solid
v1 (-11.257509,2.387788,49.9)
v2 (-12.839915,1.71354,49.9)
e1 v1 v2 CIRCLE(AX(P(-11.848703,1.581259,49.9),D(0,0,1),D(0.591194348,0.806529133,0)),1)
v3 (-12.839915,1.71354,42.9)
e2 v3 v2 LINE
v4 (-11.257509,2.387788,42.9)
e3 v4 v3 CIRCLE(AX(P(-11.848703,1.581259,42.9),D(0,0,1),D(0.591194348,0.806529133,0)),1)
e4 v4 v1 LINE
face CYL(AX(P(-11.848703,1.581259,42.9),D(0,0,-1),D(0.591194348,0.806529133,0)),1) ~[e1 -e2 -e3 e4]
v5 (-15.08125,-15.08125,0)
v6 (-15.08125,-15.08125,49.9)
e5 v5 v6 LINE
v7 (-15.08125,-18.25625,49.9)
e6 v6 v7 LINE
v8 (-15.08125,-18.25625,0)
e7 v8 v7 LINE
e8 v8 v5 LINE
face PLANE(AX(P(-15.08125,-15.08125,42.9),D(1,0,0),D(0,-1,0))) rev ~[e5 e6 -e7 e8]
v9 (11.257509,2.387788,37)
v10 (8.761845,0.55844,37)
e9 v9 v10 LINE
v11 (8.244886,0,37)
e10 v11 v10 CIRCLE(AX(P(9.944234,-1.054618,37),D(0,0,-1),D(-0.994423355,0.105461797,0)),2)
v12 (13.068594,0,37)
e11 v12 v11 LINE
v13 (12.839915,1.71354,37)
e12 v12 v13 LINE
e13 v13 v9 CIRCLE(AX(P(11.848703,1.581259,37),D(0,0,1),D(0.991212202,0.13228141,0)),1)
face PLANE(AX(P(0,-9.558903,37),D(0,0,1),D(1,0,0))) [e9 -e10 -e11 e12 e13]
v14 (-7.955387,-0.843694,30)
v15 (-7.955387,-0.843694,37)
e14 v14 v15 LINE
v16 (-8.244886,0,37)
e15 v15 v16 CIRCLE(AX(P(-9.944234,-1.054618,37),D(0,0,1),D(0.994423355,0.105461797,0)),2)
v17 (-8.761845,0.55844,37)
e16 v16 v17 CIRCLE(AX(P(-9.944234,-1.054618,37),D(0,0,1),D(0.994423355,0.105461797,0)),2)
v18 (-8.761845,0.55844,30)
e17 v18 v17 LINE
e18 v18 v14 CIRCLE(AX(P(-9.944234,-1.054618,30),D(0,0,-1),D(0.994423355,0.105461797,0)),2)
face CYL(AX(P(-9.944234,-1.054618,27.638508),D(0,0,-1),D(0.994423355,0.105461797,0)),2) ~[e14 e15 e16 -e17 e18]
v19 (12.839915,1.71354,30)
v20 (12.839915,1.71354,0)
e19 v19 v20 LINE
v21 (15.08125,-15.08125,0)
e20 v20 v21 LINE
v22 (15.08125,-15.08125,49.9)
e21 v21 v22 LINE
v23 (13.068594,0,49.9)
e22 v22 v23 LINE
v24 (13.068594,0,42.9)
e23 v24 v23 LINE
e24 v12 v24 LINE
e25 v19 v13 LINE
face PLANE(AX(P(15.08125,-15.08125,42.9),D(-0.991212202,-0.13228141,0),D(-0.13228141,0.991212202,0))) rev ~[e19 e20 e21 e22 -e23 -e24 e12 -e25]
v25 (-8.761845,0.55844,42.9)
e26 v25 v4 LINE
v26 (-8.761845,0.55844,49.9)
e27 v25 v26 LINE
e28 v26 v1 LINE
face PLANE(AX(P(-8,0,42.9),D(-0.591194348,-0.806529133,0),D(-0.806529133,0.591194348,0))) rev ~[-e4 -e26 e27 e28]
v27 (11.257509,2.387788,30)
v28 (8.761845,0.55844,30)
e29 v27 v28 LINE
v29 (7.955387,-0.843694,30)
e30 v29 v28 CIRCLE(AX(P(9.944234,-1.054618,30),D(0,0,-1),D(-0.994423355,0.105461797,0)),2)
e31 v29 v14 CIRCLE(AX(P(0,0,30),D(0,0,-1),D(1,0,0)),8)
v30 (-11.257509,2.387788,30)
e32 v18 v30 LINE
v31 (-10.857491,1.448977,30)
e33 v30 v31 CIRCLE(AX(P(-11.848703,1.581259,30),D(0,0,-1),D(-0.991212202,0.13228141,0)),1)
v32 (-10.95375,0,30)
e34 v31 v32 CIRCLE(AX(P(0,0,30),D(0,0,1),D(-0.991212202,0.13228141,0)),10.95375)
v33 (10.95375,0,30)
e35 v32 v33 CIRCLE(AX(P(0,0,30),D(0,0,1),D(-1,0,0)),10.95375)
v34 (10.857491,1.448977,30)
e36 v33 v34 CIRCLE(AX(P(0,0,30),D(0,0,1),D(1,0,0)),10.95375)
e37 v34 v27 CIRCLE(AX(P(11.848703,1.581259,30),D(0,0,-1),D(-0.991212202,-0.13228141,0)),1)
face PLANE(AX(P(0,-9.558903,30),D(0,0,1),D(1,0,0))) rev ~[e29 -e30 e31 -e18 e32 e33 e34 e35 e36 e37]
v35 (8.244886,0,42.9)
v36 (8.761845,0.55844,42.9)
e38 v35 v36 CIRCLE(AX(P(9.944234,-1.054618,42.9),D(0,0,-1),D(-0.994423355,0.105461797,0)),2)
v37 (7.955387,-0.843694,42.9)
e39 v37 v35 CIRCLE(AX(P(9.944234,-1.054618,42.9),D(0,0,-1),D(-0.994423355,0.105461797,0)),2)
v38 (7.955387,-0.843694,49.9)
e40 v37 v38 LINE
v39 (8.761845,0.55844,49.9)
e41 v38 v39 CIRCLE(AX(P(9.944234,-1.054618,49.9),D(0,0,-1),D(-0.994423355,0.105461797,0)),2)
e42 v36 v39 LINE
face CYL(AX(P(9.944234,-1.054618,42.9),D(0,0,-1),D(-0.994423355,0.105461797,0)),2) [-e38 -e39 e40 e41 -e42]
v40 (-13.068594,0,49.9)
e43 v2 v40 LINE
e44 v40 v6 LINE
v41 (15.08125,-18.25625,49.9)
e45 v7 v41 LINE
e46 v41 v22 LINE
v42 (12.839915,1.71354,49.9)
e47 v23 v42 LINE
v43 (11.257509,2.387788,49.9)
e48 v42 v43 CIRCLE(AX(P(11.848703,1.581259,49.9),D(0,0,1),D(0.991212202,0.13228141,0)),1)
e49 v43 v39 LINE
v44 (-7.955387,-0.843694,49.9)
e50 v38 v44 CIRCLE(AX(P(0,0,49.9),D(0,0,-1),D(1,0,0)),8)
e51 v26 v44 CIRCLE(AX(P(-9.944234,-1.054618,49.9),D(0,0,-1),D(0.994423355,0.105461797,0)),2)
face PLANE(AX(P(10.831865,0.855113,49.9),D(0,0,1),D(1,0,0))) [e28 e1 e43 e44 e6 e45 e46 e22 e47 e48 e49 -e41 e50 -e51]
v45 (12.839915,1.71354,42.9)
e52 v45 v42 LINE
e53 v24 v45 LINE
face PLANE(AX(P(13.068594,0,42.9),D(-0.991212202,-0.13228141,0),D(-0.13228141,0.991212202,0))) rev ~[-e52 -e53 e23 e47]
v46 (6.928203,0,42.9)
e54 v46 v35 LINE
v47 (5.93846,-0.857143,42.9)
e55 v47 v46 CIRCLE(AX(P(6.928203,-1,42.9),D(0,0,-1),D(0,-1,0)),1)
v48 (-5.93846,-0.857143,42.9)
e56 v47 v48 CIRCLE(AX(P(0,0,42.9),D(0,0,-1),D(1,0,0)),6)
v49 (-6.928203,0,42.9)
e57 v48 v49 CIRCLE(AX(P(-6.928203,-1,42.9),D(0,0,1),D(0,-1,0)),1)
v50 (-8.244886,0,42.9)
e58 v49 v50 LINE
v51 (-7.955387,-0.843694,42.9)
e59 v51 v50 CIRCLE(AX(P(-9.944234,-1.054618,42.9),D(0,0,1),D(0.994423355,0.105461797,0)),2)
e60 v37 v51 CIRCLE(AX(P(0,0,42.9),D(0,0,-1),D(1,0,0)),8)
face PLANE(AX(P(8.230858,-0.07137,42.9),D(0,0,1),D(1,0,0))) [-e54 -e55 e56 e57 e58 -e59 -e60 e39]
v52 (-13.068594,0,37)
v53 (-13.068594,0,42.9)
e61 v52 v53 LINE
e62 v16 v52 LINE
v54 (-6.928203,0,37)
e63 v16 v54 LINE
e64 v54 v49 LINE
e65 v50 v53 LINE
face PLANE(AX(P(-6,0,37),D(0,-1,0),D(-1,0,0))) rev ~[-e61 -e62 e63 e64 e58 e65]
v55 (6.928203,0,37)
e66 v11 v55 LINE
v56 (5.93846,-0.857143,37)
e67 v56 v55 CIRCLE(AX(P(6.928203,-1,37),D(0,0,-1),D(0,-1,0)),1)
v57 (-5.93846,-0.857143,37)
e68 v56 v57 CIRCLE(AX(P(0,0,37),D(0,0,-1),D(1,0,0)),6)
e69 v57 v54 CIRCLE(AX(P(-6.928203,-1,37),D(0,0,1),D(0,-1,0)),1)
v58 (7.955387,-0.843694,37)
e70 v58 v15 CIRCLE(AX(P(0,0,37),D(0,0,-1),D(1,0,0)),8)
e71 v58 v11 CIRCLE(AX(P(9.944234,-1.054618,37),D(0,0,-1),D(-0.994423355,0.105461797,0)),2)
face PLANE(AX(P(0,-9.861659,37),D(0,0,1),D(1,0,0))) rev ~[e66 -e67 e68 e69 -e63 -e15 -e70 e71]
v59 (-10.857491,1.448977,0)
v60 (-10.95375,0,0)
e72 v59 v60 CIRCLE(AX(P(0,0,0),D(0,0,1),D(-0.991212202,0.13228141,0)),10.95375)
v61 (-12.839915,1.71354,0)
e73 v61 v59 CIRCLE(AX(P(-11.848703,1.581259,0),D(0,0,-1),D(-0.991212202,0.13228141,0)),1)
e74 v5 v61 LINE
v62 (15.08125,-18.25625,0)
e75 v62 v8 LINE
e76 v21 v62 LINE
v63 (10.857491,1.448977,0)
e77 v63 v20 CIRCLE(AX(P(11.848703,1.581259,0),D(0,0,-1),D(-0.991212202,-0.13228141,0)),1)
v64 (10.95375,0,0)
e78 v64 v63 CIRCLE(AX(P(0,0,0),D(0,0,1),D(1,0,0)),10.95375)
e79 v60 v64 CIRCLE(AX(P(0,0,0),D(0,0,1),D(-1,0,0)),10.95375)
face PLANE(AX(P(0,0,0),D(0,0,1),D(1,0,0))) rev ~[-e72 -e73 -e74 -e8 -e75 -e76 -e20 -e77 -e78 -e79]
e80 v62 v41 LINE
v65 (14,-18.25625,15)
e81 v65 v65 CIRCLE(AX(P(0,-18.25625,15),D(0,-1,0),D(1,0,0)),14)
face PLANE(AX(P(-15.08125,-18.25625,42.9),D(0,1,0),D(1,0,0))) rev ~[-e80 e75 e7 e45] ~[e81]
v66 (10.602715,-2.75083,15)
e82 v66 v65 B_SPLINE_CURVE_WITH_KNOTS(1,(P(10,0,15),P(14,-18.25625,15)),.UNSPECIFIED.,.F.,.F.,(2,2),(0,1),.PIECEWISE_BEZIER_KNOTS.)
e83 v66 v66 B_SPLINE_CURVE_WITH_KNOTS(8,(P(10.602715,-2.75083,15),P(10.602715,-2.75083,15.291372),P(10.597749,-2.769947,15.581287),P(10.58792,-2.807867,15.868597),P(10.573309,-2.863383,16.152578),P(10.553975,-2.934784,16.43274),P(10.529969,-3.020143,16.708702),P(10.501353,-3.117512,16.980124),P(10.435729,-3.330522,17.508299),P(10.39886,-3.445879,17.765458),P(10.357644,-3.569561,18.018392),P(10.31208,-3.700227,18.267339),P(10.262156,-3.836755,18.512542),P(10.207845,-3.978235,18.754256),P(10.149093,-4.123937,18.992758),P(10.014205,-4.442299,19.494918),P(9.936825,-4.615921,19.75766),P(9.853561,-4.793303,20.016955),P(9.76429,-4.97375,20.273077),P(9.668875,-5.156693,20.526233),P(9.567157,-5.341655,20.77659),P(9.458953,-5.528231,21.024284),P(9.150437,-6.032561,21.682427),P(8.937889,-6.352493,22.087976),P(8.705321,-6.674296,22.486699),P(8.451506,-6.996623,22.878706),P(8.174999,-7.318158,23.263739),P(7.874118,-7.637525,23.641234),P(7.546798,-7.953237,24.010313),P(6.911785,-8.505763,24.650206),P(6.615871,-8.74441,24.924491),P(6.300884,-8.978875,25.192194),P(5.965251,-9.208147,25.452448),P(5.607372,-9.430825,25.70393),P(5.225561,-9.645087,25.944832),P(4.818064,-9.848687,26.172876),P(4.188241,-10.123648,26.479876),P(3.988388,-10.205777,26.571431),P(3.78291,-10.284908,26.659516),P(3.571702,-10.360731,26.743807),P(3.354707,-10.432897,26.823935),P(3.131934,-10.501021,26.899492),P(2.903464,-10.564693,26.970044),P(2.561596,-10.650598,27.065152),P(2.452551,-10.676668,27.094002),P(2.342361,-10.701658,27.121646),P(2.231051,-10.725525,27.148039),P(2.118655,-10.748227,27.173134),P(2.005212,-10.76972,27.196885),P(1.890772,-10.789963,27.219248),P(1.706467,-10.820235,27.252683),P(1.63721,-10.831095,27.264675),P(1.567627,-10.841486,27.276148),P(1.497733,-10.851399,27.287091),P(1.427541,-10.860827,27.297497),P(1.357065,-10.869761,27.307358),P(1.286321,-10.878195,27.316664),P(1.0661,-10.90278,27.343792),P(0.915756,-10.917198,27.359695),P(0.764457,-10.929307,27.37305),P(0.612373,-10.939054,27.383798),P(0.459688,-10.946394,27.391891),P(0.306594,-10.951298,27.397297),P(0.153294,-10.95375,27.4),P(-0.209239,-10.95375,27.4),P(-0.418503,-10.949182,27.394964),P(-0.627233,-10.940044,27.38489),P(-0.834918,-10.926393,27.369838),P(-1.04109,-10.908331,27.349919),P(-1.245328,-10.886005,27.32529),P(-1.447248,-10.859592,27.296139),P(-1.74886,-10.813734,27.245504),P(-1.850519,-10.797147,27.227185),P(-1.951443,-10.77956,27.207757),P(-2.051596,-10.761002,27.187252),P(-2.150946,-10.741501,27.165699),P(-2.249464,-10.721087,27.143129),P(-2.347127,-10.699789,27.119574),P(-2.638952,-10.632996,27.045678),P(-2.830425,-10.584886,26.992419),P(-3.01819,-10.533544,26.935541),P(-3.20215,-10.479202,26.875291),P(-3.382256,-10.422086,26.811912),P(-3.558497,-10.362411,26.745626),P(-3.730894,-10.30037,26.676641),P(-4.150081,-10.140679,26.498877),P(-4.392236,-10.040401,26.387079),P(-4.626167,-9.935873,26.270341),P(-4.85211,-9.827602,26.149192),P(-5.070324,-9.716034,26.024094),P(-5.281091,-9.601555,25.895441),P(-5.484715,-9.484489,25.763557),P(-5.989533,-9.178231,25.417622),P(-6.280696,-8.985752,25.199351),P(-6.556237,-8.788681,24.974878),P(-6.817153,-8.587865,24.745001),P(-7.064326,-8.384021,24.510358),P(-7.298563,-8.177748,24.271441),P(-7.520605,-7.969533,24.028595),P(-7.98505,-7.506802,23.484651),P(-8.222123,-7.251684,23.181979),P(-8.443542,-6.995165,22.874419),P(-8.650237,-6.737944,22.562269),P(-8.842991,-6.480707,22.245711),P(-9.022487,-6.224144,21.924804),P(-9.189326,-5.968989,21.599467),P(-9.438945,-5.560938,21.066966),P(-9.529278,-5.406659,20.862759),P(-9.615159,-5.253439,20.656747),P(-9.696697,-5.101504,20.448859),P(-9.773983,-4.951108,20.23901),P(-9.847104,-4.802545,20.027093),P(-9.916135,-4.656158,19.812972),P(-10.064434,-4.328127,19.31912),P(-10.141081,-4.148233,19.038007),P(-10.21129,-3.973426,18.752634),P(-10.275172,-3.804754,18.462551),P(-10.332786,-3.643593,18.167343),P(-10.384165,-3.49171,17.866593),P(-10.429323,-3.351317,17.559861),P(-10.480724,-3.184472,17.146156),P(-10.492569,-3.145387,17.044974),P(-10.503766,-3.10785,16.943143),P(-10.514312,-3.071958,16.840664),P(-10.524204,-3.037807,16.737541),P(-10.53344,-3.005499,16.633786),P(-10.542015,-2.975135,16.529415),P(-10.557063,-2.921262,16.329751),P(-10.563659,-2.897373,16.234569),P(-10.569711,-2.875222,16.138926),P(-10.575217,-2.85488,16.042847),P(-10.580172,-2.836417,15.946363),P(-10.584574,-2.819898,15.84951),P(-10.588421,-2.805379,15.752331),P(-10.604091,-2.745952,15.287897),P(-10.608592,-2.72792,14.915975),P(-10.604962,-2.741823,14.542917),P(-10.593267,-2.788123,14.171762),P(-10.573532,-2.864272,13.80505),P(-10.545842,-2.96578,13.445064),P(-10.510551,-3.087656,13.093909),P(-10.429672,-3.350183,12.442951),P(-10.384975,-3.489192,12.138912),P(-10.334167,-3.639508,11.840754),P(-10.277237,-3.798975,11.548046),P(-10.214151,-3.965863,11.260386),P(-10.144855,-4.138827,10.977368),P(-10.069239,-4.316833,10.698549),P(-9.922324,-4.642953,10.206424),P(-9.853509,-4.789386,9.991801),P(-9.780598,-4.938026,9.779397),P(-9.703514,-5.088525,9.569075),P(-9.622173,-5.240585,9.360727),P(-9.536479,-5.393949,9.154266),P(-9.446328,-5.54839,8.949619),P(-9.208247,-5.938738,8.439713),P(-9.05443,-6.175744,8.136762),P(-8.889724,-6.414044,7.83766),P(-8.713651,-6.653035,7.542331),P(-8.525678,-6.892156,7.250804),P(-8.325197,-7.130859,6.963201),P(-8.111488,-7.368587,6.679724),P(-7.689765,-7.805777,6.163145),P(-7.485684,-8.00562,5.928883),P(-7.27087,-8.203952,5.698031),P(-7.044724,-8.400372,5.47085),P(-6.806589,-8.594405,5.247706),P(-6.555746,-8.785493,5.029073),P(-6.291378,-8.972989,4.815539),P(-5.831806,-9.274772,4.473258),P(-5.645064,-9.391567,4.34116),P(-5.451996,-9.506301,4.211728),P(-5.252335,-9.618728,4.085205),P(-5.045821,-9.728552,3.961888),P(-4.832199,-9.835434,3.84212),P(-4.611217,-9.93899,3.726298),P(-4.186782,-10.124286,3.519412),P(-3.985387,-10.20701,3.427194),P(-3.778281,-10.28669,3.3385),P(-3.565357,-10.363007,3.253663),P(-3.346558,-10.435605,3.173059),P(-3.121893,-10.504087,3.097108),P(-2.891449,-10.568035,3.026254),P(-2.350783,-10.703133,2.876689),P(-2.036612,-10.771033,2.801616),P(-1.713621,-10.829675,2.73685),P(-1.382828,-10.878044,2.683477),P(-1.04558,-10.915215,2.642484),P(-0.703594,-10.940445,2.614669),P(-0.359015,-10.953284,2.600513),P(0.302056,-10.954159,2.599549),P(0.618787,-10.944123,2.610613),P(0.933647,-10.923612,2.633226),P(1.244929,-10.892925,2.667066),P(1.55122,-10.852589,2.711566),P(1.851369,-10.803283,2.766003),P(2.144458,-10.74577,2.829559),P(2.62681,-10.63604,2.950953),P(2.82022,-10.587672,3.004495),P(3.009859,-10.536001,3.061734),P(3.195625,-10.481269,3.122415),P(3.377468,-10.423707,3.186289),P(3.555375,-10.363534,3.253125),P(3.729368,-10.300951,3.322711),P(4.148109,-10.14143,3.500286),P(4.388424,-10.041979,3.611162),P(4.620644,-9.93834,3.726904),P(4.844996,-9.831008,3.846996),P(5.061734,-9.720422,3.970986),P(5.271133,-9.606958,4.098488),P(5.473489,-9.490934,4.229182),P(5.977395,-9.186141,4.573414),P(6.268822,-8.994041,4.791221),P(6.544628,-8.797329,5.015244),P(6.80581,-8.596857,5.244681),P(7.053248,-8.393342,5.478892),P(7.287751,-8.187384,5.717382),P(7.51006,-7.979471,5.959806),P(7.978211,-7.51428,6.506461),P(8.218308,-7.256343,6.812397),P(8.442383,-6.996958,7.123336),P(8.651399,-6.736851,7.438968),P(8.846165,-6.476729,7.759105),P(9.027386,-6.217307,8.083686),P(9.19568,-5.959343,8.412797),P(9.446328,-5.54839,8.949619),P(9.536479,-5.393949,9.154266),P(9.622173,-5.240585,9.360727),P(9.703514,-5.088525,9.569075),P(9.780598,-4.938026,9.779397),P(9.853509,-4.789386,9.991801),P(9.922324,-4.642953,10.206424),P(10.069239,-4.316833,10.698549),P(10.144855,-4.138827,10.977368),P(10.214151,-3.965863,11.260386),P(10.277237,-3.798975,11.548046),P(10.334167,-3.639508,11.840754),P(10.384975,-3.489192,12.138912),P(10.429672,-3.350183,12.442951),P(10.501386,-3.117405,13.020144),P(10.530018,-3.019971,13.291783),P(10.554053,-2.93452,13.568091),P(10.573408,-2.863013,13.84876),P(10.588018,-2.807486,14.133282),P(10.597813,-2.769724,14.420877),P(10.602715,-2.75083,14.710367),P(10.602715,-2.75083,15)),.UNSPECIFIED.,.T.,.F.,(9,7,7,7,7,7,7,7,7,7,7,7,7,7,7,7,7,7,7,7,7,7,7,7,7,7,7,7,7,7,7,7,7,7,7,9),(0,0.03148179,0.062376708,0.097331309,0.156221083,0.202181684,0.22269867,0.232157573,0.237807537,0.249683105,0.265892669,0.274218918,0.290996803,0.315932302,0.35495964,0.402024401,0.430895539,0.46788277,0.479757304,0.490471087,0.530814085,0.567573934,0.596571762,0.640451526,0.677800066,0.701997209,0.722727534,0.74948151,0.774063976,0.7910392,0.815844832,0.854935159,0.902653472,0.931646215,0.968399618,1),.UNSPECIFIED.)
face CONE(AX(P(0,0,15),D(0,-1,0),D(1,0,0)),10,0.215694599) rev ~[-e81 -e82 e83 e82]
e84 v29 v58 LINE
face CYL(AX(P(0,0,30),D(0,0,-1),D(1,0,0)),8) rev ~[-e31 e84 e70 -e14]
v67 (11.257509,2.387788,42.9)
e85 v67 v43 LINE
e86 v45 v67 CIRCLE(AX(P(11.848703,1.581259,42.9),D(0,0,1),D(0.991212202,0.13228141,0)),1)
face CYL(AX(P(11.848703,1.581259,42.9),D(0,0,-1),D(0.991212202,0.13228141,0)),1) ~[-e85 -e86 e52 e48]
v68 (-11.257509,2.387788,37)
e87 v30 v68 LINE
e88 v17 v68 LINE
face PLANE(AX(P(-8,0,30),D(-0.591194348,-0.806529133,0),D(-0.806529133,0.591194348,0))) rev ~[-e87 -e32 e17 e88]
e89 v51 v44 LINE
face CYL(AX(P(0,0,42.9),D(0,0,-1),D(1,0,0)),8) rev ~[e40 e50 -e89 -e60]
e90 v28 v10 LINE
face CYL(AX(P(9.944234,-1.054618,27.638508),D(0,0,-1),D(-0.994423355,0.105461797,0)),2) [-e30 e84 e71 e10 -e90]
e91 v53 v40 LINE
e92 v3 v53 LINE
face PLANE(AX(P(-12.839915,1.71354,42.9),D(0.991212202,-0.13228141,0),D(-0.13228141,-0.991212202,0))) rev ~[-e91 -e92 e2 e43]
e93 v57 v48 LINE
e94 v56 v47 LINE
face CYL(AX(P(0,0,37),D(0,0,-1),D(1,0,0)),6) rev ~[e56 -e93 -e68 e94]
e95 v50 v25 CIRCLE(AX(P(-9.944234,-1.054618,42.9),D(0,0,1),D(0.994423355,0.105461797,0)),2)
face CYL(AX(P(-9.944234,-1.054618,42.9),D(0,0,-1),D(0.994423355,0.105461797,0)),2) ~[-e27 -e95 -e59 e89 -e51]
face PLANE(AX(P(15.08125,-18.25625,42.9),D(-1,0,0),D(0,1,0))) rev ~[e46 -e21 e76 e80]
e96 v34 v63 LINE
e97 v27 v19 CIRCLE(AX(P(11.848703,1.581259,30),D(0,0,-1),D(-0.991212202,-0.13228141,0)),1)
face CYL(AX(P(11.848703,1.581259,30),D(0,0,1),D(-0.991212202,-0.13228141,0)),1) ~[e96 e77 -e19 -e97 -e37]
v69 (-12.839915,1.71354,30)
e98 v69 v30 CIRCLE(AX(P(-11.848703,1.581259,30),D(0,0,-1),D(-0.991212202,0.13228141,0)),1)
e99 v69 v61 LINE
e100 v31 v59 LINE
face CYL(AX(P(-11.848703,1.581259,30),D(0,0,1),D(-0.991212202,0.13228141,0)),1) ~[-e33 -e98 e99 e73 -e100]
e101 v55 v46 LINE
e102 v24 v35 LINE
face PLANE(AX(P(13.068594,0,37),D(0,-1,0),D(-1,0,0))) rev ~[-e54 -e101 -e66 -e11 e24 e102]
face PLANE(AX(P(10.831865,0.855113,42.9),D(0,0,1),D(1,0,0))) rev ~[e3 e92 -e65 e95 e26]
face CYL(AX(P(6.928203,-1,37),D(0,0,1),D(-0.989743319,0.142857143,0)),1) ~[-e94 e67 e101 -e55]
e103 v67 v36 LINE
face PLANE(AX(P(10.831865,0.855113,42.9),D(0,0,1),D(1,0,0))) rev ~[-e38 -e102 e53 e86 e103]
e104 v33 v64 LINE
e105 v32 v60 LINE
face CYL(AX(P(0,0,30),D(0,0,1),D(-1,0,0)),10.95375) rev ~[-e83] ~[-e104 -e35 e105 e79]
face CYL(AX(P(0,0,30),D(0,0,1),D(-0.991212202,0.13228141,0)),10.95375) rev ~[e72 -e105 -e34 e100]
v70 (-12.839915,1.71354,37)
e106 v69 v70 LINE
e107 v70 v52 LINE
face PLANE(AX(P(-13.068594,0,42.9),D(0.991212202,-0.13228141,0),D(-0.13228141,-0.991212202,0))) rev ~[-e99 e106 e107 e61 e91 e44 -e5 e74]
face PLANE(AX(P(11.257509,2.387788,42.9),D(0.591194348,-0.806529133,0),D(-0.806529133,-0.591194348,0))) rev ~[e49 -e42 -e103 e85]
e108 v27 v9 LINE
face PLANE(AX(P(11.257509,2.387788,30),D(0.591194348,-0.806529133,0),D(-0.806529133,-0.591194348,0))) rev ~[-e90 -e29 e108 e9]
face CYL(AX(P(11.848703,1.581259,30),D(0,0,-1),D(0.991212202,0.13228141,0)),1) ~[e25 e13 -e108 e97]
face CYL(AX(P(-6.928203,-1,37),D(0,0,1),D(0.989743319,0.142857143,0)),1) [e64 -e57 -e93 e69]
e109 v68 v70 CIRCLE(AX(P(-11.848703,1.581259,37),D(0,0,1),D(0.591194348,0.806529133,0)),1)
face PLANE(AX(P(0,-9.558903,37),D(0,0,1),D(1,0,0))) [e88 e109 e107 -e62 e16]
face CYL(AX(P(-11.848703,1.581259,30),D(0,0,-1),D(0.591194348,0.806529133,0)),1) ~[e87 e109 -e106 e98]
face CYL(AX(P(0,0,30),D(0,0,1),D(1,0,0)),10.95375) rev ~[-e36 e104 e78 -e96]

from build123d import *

# Parameters (mm, degrees)
F0_W         = 50.8
F0_H         = 50.8
F1_DEPTH     = 30
F2_W         = 50.8
F2_H         = 50.8
F3_DEPTH     = 30
F5_R         = 10
F4_R         = 14
F8_DEPTH     = 7
F10_DEPTH    = 5.9
F12_DEPTH    = 7
F13_T1_DEPTH = 9.3614920568
F13_T3_DEPTH = 9.3614920568
F14_R        = 1


# Not quite as in the source:
# - a fillet or chamfer that OpenCascade refuses, or shapes differently, is made with other operations: its cross-section is extruded or revolved along the edge and cut away or added


with BuildPart() as f1:
    # F0 (on Top) → F1 (new body)
    with BuildSketch(Plane.XY):
        Rectangle(F0_W, F0_H)
    extrude(amount=F1_DEPTH)

    # F2 (on face) → F3 (cut, through all)
    with BuildSketch(Plane.XY.offset(30)):
        Rectangle(F2_W, F2_H)
        with BuildLine():
            ThreePointArc((-12.8399150562, 1.7135403152), (-11.7164214446, 2.5724711068), (-10.857490653, 1.4489774952))
            ThreePointArc((-10.857490653, 1.4489774952), (-10.9296586704, 0.7260856773), (-10.95375, 0))
            Line((-10.95375, 0), (10.95375, 0))
            ThreePointArc((10.95375, 0), (10.9296586704, 0.7260856773), (10.857490653, 1.4489774952))
            ThreePointArc((10.857490653, 1.4489774952), (11.7164214446, 2.5724711068), (12.8399150562, 1.7135403152))
            Line((12.8399150562, 1.7135403152), (15.08125, -15.08125))
            Line((15.08125, -15.08125), (15.08125, -18.25625))
            Line((15.08125, -18.25625), (-15.08125, -18.25625))
            Line((-15.08125, -18.25625), (-15.08125, -15.08125))
            Line((-15.08125, -15.08125), (-12.8399150562, 1.7135403152))
        make_face(mode=Mode.SUBTRACT)
        with BuildLine():
            Line((10.95375, 0), (-10.95375, 0))
            ThreePointArc((-10.95375, 0), (0, -10.95375), (10.95375, 0))
        make_face()
    extrude(amount=-F3_DEPTH, mode=Mode.SUBTRACT)

    # F5 (on Front) → F6 section 0
    with BuildSketch(Plane.XZ):
        with Locations((0, 15)):
            Circle(F5_R)
    # F4 (on face) → F6 section 1
    with BuildSketch(Plane.XZ.offset(18.25625)):
        with Locations((0, 15)):
            Circle(F4_R)
    loft(mode=Mode.SUBTRACT)

    # F7 (on face) → F8 (join)
    with BuildSketch(Plane.XY.offset(30)):
        with BuildLine():
            ThreePointArc((-10.857490653, 1.4489774952), (-10.9287333274, 1.9732487889), (-11.2575085067, 2.3877880386))
            ThreePointArc((-11.2575085067, 2.3877880386), (-12.2406927383, 2.5012284324), (-12.8399150562, 1.7135403152))
            Line((-12.8399150562, 1.7135403152), (-15.08125, -15.08125))
            Line((-15.08125, -15.08125), (-15.08125, -18.25625))
            Line((-15.08125, -18.25625), (15.08125, -18.25625))
            Line((15.08125, -18.25625), (15.08125, -15.08125))
            Line((15.08125, -15.08125), (12.8399150562, 1.7135403152))
            ThreePointArc((12.8399150562, 1.7135403152), (12.2406927383, 2.5012284324), (11.2575085067, 2.3877880386))
            ThreePointArc((11.2575085067, 2.3877880386), (10.9287333274, 1.9732487889), (10.857490653, 1.4489774952))
            ThreePointArc((10.8574906531, 1.4489774952), (0, -10.95375), (-10.857490653, 1.4489774952))
        make_face()
        with BuildLine():
            ThreePointArc((8, 0), (0, -8), (-8, 0))
            Line((-8, 0), (-11.2575085067, 2.3877880386))
            ThreePointArc((-11.2575085067, 2.3877880386), (-10.9287333274, 1.9732487889), (-10.857490653, 1.4489774952))
            ThreePointArc((-10.857490653, 1.4489774952), (0, -10.95375), (10.8574906531, 1.4489774952))
            ThreePointArc((10.857490653, 1.4489774952), (10.9287333274, 1.9732487889), (11.2575085067, 2.3877880386))
            Line((11.2575085067, 2.3877880386), (8, 0))
        make_face()
    extrude(amount=F8_DEPTH)

    # F9 (on face) → F10 (join)
    with BuildSketch(Plane.XY.offset(37)):
        with BuildLine():
            ThreePointArc((8, 0), (0, -8), (-8, 0))
            Line((-8, 0), (-13.0685941712, 0))
            Line((-13.0685941712, 0), (-15.08125, -15.08125))
            Line((-15.08125, -15.08125), (-15.08125, -18.25625))
            Line((-15.08125, -18.25625), (15.08125, -18.25625))
            Line((15.08125, -18.25625), (15.08125, -15.08125))
            Line((15.08125, -15.08125), (13.0685941712, 0))
            Line((13.0685941712, 0), (8, 0))
        make_face()
        with BuildLine():
            ThreePointArc((6, 0), (0, -6), (-6, 0))
            Line((-6, 0), (-8, 0))
            ThreePointArc((-8, 0), (0, -8), (8, 0))
            Line((8, 0), (6, 0))
        make_face()
    extrude(amount=F10_DEPTH)

    # F11 (on face) → F12 (join)
    with BuildSketch(Plane.XY.offset(42.9)):
        with BuildLine():
            Line((11.2575085067, 2.3877880386), (8, 0))
            Line((8, 0), (13.0685941712, 0))
            Line((13.0685941712, 0), (12.8399150562, 1.7135403152))
            ThreePointArc((12.8399150562, 1.7135403152), (12.2406927383, 2.5012284324), (11.2575085067, 2.3877880386))
        make_face()
        with BuildLine():
            Line((-13.0685941712, 0), (-8, 0))
            Line((-8, 0), (-11.2575085067, 2.3877880386))
            ThreePointArc((-11.2575085067, 2.3877880386), (-12.2406927383, 2.5012284324), (-12.8399150562, 1.7135403152))
            Line((-12.8399150562, 1.7135403152), (-13.0685941712, 0))
        make_face()
        with BuildLine():
            ThreePointArc((8, 0), (0, -8), (-8, 0))
            Line((-8, 0), (-13.0685941712, 0))
            Line((-13.0685941712, 0), (-15.08125, -15.08125))
            Line((-15.08125, -15.08125), (-15.08125, -18.25625))
            Line((-15.08125, -18.25625), (15.08125, -18.25625))
            Line((15.08125, -18.25625), (15.08125, -15.08125))
            Line((15.08125, -15.08125), (13.0685941712, 0))
            Line((13.0685941712, 0), (8, 0))
        make_face()
    extrude(amount=F12_DEPTH)

    # F13: fillet of radius 2 on 4 edges, made by hand

    # F13_s2 → F13_t1 (cut)
    with BuildSketch(Plane.XY.offset(42.9)):
        with BuildLine():
            ThreePointArc((-7.9553868421, -0.8436943713), (-8.2105441596, -0.0574614627), (-8.7618448568, 0.5584403027))
            Line((-8.7618448568, 0.5584403027), (-8, 0))
            ThreePointArc((-8, 0), (-7.9888389249, -0.4224365414), (-7.9553868421, -0.8436943713))
        make_face()
        with BuildLine():
            ThreePointArc((7.9553868421, -0.8436943713), (8.2105441596, -0.0574614627), (8.7618448568, 0.5584403027))
            Line((8.7618448568, 0.5584403027), (8, 0))
            ThreePointArc((8, 0), (7.9888389249, -0.4224365414), (7.9553868421, -0.8436943713))
        make_face()
    extrude(amount=F13_T1_DEPTH, mode=Mode.SUBTRACT)

    # F13_s4 → F13_t3 (cut)
    with BuildSketch(Plane.XY.offset(27.6385079432)):
        with BuildLine():
            ThreePointArc((-7.9553868421, -0.8436943713), (-8.2105441596, -0.0574614627), (-8.7618448568, 0.5584403027))
            Line((-8.7618448568, 0.5584403027), (-8, 0))
            ThreePointArc((-8, 0), (-7.9888389249, -0.4224365414), (-7.9553868421, -0.8436943713))
        make_face()
        with BuildLine():
            ThreePointArc((7.9553868421, -0.8436943713), (8.2105441596, -0.0574614627), (8.7618448568, 0.5584403027))
            Line((8.7618448568, 0.5584403027), (8, 0))
            ThreePointArc((8, 0), (7.9888389249, -0.4224365414), (7.9553868421, -0.8436943713))
        make_face()
    extrude(amount=F13_T3_DEPTH, mode=Mode.SUBTRACT)

    # F14
    f14_edges = [f1.edges().sort_by_distance(p)[0] for p in [
        (-6, 0, 39.95),
        (6, 0, 39.95),
    ]]
    fillet(f14_edges, radius=F14_R)


solid = f1.part
